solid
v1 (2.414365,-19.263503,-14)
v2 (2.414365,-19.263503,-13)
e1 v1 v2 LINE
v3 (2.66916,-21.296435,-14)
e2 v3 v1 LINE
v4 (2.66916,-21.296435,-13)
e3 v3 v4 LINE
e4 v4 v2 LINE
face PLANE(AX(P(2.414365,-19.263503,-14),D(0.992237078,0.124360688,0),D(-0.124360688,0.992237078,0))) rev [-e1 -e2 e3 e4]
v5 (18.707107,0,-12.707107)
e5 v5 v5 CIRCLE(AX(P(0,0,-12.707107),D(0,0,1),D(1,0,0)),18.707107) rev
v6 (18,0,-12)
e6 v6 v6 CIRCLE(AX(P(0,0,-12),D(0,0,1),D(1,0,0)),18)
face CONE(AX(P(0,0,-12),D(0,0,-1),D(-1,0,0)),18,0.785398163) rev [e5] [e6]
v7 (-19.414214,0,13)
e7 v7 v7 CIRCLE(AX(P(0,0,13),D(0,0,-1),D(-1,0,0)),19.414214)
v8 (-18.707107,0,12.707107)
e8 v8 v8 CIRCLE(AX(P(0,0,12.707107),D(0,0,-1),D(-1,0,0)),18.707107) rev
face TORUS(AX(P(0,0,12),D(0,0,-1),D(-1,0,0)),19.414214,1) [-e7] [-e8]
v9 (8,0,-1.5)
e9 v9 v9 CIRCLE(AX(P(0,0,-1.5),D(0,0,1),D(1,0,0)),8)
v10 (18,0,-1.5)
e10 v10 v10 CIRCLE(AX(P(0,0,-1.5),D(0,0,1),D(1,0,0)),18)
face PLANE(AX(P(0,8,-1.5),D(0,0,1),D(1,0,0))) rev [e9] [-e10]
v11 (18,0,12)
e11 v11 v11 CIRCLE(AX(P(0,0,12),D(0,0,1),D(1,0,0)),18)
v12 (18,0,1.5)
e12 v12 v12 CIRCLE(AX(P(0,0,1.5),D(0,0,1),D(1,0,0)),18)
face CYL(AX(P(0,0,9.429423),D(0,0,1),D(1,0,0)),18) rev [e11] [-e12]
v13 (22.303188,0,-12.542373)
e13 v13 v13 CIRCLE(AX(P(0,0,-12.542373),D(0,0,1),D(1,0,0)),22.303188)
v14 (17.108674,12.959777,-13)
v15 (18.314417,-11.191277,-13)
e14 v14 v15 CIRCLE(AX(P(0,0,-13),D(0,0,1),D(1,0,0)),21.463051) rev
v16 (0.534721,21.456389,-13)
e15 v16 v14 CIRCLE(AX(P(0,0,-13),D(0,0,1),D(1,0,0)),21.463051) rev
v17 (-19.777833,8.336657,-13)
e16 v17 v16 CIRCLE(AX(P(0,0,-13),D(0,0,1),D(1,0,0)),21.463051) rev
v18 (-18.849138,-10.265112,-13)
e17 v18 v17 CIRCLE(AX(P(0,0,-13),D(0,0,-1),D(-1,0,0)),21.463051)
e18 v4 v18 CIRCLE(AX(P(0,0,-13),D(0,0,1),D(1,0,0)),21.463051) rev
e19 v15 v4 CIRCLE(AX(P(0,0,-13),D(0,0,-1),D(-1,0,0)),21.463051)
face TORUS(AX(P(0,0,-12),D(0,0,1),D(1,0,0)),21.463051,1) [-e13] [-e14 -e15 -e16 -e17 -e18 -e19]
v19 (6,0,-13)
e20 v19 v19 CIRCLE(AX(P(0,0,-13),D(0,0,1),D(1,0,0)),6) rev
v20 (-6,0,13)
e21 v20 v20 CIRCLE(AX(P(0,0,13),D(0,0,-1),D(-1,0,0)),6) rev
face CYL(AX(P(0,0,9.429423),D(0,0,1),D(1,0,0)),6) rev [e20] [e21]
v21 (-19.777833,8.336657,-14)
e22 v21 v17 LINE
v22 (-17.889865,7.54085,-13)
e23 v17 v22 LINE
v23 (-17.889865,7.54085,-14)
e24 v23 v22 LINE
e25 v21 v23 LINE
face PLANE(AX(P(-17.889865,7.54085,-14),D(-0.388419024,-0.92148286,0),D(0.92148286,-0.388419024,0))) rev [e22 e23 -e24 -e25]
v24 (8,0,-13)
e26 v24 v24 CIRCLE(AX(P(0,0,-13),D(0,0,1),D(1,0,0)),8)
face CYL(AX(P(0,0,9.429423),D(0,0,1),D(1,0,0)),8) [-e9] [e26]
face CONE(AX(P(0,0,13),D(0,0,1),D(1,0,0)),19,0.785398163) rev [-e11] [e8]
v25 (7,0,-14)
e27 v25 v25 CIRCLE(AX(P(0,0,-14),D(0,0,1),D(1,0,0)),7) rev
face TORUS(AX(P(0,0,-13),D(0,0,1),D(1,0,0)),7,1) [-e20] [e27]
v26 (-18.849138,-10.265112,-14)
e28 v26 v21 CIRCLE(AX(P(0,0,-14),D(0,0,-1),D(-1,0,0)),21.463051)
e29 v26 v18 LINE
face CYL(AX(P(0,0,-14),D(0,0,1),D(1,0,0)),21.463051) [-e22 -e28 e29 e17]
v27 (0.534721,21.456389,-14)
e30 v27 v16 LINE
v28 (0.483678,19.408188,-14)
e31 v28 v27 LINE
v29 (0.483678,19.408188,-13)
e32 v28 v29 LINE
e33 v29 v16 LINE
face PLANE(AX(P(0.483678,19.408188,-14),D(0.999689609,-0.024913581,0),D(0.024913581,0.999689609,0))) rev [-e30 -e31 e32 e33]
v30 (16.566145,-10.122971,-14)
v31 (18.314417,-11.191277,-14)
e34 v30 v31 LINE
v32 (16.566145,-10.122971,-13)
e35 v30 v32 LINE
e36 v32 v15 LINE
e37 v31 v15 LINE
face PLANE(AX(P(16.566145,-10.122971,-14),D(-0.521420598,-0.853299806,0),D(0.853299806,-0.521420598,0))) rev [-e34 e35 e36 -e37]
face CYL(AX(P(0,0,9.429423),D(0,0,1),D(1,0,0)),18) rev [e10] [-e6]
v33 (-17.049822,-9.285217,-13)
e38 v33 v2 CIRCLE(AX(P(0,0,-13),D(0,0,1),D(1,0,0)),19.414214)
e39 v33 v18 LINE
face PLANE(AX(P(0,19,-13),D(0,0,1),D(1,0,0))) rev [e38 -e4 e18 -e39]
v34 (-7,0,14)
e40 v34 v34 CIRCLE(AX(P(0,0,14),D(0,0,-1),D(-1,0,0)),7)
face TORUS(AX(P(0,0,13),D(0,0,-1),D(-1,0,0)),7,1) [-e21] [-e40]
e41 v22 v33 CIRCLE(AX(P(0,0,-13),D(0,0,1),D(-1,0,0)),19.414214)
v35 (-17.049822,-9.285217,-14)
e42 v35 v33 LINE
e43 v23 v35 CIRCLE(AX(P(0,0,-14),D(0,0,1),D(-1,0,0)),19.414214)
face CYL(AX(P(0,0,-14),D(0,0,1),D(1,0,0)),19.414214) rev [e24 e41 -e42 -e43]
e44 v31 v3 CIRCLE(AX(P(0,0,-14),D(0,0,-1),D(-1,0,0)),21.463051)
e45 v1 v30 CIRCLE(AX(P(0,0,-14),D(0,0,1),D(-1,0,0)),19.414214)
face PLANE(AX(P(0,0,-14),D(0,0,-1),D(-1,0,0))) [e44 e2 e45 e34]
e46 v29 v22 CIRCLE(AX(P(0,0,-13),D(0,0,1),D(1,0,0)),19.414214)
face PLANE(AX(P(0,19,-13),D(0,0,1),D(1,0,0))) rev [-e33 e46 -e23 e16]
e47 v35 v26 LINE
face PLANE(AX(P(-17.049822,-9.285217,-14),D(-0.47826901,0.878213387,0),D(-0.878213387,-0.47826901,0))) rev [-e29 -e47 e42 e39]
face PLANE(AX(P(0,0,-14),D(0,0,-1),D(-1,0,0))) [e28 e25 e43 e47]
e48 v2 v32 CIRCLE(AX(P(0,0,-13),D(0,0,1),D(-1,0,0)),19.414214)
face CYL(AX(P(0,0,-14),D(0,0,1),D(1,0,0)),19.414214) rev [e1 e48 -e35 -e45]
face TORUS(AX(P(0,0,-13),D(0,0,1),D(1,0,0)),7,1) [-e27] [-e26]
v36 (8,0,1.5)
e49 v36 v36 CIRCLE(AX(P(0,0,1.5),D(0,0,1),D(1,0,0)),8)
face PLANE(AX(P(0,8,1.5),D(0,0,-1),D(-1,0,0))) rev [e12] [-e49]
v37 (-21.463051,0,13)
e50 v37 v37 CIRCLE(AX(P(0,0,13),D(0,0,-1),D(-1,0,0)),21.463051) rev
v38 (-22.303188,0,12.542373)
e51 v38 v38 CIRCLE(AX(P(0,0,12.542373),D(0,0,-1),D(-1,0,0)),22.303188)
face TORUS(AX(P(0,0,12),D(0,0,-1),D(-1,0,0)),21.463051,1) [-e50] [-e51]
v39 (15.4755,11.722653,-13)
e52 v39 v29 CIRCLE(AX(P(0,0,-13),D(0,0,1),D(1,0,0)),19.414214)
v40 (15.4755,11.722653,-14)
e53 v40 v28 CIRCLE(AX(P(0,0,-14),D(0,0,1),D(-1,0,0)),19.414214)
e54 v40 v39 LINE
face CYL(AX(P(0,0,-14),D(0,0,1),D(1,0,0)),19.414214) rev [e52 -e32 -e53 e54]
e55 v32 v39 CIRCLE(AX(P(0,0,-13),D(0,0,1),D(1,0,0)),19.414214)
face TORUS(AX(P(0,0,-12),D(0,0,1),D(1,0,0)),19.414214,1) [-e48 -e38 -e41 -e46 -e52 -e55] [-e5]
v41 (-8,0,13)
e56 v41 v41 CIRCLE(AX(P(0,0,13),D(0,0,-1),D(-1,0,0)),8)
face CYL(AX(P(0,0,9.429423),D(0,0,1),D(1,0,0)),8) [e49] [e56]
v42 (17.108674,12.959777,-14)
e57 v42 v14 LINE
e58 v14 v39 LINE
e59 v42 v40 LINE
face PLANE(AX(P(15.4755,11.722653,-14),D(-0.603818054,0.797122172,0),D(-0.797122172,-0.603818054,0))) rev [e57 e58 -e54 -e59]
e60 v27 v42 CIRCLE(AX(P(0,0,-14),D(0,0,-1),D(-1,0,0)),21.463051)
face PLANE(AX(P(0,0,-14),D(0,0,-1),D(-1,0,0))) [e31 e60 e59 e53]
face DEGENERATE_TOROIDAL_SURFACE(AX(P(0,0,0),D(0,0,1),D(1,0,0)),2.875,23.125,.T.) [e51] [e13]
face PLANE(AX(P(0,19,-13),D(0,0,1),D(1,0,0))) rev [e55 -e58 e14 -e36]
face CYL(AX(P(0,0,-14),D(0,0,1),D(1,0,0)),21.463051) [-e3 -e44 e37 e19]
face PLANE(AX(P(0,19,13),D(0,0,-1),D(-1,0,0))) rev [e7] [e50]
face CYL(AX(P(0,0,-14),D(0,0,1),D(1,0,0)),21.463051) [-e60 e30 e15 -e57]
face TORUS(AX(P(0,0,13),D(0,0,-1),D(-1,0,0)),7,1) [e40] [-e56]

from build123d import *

# Parameters (mm, degrees)
FILLET1_R           = 0.5
FILLET2_R           = 0.5
FILLET3_R           = 0.5
FILLET4_R           = 0.5
SCALE1_SCALE        = 2
BOSS_EXTRUDE1_DEPTH = 1


with BuildPart() as part:
    # Esquisse1 → Révolution1 (revolve)
    with BuildSketch(Plane(origin=(0, 0, 0), x_dir=(0, 0, -1), z_dir=(1, 0, 0)), mode=Mode.PRIVATE) as r_volution1_sk:
        with BuildLine():
            Line((7, 3), (-7, 3))
            Line((-7, 3), (-7, 4))
            Line((-7, 4), (-0.75, 4))
            Line((-0.75, 4), (-0.75, 9))
            Line((-0.75, 9), (-6, 9))
            Line((-6, 9), (-6.5, 9.5))
            Line((-6.5, 9.5), (-6.5, 11))
            ThreePointArc((-6.5, 11), (0, 13), (6.5, 11))
            Line((6.5, 11), (6.5, 9.5))
            Line((6.5, 9.5), (6, 9))
            Line((6, 9), (0.75, 9))
            Line((0.75, 9), (0.75, 4))
            Line((0.75, 4), (7, 4))
            Line((7, 4), (7, 3))
        make_face()
    revolve(r_volution1_sk.sketch.rotate(Axis((0, 0, 4.7147115), (0, 0, -1)), 90), axis=Axis((0, 0, 4.7147115), (0, 0, -1)))

    # Fillet1
    fillet1_edges = [part.edges().sort_by_distance(p)[0] for p in [
        (-4, 0, -7),
        (-3, 0, -7),
    ]]
    fillet(fillet1_edges, radius=FILLET1_R - 0.0001)  # a hair under: the kernel refuses the full size

    # Fillet2
    fillet2_edges = [part.edges().sort_by_distance(p)[0] for p in [
        (-3, 0, 7),
        (-4, 0, 7),
    ]]
    fillet(fillet2_edges, radius=FILLET2_R - 0.0001)  # a hair under: the kernel refuses the full size

    # Fillet3
    fillet3_edges = [part.edges().sort_by_distance(p)[0] for p in [
        (-9.5, 0, 6.5),
        (-11, 0, 6.5),
    ]]
    fillet(fillet3_edges, radius=FILLET3_R)

    # Fillet4
    fillet4_edges = [part.edges().sort_by_distance(p)[0] for p in [
        (-11, 0, -6.5),
        (-9.5, 0, -6.5),
    ]]
    fillet(fillet4_edges, radius=FILLET4_R)


with BuildPart() as part_1:
    # Scale1: scaled about (-3.9e-08, 0, 1.45e-07)
    add(part.part.scale(SCALE1_SCALE).moved(Location((3.9e-08, 0, -1.45e-07))))

    # Sketch1 → Boss-Extrude1 (add)
    with BuildSketch(Plane(origin=(0, 0, -13), x_dir=(-1, 0, 0), z_dir=(0, 0, -1))):
        with BuildLine():
            Line((-15.475500088, 11.722652655), (-17.108673516, 12.959777446))
            ThreePointArc((-17.108673516, 12.959777446), (-9.791345513, 19.09953125), (-0.534721447, 21.45638865))
            Line((-0.534721447, 21.45638865), (-0.48367758, 19.408187557))
            ThreePointArc((-0.48367758, 19.408187557), (-8.856675429, 17.276312934), (-15.475500088, 11.722652655))
        make_face()
        with BuildLine():
            Line((17.889865043, 7.540849885), (19.777833254, 8.336657167))
            ThreePointArc((19.777833254, 8.336657167), (21.43635202, -1.070211674), (18.849138368, -10.265111968))
            Line((18.849138368, -10.265111968), (17.049822256, -9.285216707))
            ThreePointArc((17.049822256, -9.285216707), (19.390063599, -0.968050553), (17.889865043, 7.540849885))
        make_face()
        with BuildLine():
            Line((-2.414364955, -19.26350254), (-2.669159738, -21.296434613))
            ThreePointArc((-2.669159738, -21.296434613), (-11.645006507, -18.029319576), (-18.314416921, -11.191276683))
            Line((-18.314416921, -11.191276683), (-16.566144676, -10.12297085))
            ThreePointArc((-16.566144676, -10.12297085), (-10.53338817, -16.308262381), (-2.414364955, -19.26350254))
        make_face()
    extrude(amount=BOSS_EXTRUDE1_DEPTH)


solid = part_1.part
